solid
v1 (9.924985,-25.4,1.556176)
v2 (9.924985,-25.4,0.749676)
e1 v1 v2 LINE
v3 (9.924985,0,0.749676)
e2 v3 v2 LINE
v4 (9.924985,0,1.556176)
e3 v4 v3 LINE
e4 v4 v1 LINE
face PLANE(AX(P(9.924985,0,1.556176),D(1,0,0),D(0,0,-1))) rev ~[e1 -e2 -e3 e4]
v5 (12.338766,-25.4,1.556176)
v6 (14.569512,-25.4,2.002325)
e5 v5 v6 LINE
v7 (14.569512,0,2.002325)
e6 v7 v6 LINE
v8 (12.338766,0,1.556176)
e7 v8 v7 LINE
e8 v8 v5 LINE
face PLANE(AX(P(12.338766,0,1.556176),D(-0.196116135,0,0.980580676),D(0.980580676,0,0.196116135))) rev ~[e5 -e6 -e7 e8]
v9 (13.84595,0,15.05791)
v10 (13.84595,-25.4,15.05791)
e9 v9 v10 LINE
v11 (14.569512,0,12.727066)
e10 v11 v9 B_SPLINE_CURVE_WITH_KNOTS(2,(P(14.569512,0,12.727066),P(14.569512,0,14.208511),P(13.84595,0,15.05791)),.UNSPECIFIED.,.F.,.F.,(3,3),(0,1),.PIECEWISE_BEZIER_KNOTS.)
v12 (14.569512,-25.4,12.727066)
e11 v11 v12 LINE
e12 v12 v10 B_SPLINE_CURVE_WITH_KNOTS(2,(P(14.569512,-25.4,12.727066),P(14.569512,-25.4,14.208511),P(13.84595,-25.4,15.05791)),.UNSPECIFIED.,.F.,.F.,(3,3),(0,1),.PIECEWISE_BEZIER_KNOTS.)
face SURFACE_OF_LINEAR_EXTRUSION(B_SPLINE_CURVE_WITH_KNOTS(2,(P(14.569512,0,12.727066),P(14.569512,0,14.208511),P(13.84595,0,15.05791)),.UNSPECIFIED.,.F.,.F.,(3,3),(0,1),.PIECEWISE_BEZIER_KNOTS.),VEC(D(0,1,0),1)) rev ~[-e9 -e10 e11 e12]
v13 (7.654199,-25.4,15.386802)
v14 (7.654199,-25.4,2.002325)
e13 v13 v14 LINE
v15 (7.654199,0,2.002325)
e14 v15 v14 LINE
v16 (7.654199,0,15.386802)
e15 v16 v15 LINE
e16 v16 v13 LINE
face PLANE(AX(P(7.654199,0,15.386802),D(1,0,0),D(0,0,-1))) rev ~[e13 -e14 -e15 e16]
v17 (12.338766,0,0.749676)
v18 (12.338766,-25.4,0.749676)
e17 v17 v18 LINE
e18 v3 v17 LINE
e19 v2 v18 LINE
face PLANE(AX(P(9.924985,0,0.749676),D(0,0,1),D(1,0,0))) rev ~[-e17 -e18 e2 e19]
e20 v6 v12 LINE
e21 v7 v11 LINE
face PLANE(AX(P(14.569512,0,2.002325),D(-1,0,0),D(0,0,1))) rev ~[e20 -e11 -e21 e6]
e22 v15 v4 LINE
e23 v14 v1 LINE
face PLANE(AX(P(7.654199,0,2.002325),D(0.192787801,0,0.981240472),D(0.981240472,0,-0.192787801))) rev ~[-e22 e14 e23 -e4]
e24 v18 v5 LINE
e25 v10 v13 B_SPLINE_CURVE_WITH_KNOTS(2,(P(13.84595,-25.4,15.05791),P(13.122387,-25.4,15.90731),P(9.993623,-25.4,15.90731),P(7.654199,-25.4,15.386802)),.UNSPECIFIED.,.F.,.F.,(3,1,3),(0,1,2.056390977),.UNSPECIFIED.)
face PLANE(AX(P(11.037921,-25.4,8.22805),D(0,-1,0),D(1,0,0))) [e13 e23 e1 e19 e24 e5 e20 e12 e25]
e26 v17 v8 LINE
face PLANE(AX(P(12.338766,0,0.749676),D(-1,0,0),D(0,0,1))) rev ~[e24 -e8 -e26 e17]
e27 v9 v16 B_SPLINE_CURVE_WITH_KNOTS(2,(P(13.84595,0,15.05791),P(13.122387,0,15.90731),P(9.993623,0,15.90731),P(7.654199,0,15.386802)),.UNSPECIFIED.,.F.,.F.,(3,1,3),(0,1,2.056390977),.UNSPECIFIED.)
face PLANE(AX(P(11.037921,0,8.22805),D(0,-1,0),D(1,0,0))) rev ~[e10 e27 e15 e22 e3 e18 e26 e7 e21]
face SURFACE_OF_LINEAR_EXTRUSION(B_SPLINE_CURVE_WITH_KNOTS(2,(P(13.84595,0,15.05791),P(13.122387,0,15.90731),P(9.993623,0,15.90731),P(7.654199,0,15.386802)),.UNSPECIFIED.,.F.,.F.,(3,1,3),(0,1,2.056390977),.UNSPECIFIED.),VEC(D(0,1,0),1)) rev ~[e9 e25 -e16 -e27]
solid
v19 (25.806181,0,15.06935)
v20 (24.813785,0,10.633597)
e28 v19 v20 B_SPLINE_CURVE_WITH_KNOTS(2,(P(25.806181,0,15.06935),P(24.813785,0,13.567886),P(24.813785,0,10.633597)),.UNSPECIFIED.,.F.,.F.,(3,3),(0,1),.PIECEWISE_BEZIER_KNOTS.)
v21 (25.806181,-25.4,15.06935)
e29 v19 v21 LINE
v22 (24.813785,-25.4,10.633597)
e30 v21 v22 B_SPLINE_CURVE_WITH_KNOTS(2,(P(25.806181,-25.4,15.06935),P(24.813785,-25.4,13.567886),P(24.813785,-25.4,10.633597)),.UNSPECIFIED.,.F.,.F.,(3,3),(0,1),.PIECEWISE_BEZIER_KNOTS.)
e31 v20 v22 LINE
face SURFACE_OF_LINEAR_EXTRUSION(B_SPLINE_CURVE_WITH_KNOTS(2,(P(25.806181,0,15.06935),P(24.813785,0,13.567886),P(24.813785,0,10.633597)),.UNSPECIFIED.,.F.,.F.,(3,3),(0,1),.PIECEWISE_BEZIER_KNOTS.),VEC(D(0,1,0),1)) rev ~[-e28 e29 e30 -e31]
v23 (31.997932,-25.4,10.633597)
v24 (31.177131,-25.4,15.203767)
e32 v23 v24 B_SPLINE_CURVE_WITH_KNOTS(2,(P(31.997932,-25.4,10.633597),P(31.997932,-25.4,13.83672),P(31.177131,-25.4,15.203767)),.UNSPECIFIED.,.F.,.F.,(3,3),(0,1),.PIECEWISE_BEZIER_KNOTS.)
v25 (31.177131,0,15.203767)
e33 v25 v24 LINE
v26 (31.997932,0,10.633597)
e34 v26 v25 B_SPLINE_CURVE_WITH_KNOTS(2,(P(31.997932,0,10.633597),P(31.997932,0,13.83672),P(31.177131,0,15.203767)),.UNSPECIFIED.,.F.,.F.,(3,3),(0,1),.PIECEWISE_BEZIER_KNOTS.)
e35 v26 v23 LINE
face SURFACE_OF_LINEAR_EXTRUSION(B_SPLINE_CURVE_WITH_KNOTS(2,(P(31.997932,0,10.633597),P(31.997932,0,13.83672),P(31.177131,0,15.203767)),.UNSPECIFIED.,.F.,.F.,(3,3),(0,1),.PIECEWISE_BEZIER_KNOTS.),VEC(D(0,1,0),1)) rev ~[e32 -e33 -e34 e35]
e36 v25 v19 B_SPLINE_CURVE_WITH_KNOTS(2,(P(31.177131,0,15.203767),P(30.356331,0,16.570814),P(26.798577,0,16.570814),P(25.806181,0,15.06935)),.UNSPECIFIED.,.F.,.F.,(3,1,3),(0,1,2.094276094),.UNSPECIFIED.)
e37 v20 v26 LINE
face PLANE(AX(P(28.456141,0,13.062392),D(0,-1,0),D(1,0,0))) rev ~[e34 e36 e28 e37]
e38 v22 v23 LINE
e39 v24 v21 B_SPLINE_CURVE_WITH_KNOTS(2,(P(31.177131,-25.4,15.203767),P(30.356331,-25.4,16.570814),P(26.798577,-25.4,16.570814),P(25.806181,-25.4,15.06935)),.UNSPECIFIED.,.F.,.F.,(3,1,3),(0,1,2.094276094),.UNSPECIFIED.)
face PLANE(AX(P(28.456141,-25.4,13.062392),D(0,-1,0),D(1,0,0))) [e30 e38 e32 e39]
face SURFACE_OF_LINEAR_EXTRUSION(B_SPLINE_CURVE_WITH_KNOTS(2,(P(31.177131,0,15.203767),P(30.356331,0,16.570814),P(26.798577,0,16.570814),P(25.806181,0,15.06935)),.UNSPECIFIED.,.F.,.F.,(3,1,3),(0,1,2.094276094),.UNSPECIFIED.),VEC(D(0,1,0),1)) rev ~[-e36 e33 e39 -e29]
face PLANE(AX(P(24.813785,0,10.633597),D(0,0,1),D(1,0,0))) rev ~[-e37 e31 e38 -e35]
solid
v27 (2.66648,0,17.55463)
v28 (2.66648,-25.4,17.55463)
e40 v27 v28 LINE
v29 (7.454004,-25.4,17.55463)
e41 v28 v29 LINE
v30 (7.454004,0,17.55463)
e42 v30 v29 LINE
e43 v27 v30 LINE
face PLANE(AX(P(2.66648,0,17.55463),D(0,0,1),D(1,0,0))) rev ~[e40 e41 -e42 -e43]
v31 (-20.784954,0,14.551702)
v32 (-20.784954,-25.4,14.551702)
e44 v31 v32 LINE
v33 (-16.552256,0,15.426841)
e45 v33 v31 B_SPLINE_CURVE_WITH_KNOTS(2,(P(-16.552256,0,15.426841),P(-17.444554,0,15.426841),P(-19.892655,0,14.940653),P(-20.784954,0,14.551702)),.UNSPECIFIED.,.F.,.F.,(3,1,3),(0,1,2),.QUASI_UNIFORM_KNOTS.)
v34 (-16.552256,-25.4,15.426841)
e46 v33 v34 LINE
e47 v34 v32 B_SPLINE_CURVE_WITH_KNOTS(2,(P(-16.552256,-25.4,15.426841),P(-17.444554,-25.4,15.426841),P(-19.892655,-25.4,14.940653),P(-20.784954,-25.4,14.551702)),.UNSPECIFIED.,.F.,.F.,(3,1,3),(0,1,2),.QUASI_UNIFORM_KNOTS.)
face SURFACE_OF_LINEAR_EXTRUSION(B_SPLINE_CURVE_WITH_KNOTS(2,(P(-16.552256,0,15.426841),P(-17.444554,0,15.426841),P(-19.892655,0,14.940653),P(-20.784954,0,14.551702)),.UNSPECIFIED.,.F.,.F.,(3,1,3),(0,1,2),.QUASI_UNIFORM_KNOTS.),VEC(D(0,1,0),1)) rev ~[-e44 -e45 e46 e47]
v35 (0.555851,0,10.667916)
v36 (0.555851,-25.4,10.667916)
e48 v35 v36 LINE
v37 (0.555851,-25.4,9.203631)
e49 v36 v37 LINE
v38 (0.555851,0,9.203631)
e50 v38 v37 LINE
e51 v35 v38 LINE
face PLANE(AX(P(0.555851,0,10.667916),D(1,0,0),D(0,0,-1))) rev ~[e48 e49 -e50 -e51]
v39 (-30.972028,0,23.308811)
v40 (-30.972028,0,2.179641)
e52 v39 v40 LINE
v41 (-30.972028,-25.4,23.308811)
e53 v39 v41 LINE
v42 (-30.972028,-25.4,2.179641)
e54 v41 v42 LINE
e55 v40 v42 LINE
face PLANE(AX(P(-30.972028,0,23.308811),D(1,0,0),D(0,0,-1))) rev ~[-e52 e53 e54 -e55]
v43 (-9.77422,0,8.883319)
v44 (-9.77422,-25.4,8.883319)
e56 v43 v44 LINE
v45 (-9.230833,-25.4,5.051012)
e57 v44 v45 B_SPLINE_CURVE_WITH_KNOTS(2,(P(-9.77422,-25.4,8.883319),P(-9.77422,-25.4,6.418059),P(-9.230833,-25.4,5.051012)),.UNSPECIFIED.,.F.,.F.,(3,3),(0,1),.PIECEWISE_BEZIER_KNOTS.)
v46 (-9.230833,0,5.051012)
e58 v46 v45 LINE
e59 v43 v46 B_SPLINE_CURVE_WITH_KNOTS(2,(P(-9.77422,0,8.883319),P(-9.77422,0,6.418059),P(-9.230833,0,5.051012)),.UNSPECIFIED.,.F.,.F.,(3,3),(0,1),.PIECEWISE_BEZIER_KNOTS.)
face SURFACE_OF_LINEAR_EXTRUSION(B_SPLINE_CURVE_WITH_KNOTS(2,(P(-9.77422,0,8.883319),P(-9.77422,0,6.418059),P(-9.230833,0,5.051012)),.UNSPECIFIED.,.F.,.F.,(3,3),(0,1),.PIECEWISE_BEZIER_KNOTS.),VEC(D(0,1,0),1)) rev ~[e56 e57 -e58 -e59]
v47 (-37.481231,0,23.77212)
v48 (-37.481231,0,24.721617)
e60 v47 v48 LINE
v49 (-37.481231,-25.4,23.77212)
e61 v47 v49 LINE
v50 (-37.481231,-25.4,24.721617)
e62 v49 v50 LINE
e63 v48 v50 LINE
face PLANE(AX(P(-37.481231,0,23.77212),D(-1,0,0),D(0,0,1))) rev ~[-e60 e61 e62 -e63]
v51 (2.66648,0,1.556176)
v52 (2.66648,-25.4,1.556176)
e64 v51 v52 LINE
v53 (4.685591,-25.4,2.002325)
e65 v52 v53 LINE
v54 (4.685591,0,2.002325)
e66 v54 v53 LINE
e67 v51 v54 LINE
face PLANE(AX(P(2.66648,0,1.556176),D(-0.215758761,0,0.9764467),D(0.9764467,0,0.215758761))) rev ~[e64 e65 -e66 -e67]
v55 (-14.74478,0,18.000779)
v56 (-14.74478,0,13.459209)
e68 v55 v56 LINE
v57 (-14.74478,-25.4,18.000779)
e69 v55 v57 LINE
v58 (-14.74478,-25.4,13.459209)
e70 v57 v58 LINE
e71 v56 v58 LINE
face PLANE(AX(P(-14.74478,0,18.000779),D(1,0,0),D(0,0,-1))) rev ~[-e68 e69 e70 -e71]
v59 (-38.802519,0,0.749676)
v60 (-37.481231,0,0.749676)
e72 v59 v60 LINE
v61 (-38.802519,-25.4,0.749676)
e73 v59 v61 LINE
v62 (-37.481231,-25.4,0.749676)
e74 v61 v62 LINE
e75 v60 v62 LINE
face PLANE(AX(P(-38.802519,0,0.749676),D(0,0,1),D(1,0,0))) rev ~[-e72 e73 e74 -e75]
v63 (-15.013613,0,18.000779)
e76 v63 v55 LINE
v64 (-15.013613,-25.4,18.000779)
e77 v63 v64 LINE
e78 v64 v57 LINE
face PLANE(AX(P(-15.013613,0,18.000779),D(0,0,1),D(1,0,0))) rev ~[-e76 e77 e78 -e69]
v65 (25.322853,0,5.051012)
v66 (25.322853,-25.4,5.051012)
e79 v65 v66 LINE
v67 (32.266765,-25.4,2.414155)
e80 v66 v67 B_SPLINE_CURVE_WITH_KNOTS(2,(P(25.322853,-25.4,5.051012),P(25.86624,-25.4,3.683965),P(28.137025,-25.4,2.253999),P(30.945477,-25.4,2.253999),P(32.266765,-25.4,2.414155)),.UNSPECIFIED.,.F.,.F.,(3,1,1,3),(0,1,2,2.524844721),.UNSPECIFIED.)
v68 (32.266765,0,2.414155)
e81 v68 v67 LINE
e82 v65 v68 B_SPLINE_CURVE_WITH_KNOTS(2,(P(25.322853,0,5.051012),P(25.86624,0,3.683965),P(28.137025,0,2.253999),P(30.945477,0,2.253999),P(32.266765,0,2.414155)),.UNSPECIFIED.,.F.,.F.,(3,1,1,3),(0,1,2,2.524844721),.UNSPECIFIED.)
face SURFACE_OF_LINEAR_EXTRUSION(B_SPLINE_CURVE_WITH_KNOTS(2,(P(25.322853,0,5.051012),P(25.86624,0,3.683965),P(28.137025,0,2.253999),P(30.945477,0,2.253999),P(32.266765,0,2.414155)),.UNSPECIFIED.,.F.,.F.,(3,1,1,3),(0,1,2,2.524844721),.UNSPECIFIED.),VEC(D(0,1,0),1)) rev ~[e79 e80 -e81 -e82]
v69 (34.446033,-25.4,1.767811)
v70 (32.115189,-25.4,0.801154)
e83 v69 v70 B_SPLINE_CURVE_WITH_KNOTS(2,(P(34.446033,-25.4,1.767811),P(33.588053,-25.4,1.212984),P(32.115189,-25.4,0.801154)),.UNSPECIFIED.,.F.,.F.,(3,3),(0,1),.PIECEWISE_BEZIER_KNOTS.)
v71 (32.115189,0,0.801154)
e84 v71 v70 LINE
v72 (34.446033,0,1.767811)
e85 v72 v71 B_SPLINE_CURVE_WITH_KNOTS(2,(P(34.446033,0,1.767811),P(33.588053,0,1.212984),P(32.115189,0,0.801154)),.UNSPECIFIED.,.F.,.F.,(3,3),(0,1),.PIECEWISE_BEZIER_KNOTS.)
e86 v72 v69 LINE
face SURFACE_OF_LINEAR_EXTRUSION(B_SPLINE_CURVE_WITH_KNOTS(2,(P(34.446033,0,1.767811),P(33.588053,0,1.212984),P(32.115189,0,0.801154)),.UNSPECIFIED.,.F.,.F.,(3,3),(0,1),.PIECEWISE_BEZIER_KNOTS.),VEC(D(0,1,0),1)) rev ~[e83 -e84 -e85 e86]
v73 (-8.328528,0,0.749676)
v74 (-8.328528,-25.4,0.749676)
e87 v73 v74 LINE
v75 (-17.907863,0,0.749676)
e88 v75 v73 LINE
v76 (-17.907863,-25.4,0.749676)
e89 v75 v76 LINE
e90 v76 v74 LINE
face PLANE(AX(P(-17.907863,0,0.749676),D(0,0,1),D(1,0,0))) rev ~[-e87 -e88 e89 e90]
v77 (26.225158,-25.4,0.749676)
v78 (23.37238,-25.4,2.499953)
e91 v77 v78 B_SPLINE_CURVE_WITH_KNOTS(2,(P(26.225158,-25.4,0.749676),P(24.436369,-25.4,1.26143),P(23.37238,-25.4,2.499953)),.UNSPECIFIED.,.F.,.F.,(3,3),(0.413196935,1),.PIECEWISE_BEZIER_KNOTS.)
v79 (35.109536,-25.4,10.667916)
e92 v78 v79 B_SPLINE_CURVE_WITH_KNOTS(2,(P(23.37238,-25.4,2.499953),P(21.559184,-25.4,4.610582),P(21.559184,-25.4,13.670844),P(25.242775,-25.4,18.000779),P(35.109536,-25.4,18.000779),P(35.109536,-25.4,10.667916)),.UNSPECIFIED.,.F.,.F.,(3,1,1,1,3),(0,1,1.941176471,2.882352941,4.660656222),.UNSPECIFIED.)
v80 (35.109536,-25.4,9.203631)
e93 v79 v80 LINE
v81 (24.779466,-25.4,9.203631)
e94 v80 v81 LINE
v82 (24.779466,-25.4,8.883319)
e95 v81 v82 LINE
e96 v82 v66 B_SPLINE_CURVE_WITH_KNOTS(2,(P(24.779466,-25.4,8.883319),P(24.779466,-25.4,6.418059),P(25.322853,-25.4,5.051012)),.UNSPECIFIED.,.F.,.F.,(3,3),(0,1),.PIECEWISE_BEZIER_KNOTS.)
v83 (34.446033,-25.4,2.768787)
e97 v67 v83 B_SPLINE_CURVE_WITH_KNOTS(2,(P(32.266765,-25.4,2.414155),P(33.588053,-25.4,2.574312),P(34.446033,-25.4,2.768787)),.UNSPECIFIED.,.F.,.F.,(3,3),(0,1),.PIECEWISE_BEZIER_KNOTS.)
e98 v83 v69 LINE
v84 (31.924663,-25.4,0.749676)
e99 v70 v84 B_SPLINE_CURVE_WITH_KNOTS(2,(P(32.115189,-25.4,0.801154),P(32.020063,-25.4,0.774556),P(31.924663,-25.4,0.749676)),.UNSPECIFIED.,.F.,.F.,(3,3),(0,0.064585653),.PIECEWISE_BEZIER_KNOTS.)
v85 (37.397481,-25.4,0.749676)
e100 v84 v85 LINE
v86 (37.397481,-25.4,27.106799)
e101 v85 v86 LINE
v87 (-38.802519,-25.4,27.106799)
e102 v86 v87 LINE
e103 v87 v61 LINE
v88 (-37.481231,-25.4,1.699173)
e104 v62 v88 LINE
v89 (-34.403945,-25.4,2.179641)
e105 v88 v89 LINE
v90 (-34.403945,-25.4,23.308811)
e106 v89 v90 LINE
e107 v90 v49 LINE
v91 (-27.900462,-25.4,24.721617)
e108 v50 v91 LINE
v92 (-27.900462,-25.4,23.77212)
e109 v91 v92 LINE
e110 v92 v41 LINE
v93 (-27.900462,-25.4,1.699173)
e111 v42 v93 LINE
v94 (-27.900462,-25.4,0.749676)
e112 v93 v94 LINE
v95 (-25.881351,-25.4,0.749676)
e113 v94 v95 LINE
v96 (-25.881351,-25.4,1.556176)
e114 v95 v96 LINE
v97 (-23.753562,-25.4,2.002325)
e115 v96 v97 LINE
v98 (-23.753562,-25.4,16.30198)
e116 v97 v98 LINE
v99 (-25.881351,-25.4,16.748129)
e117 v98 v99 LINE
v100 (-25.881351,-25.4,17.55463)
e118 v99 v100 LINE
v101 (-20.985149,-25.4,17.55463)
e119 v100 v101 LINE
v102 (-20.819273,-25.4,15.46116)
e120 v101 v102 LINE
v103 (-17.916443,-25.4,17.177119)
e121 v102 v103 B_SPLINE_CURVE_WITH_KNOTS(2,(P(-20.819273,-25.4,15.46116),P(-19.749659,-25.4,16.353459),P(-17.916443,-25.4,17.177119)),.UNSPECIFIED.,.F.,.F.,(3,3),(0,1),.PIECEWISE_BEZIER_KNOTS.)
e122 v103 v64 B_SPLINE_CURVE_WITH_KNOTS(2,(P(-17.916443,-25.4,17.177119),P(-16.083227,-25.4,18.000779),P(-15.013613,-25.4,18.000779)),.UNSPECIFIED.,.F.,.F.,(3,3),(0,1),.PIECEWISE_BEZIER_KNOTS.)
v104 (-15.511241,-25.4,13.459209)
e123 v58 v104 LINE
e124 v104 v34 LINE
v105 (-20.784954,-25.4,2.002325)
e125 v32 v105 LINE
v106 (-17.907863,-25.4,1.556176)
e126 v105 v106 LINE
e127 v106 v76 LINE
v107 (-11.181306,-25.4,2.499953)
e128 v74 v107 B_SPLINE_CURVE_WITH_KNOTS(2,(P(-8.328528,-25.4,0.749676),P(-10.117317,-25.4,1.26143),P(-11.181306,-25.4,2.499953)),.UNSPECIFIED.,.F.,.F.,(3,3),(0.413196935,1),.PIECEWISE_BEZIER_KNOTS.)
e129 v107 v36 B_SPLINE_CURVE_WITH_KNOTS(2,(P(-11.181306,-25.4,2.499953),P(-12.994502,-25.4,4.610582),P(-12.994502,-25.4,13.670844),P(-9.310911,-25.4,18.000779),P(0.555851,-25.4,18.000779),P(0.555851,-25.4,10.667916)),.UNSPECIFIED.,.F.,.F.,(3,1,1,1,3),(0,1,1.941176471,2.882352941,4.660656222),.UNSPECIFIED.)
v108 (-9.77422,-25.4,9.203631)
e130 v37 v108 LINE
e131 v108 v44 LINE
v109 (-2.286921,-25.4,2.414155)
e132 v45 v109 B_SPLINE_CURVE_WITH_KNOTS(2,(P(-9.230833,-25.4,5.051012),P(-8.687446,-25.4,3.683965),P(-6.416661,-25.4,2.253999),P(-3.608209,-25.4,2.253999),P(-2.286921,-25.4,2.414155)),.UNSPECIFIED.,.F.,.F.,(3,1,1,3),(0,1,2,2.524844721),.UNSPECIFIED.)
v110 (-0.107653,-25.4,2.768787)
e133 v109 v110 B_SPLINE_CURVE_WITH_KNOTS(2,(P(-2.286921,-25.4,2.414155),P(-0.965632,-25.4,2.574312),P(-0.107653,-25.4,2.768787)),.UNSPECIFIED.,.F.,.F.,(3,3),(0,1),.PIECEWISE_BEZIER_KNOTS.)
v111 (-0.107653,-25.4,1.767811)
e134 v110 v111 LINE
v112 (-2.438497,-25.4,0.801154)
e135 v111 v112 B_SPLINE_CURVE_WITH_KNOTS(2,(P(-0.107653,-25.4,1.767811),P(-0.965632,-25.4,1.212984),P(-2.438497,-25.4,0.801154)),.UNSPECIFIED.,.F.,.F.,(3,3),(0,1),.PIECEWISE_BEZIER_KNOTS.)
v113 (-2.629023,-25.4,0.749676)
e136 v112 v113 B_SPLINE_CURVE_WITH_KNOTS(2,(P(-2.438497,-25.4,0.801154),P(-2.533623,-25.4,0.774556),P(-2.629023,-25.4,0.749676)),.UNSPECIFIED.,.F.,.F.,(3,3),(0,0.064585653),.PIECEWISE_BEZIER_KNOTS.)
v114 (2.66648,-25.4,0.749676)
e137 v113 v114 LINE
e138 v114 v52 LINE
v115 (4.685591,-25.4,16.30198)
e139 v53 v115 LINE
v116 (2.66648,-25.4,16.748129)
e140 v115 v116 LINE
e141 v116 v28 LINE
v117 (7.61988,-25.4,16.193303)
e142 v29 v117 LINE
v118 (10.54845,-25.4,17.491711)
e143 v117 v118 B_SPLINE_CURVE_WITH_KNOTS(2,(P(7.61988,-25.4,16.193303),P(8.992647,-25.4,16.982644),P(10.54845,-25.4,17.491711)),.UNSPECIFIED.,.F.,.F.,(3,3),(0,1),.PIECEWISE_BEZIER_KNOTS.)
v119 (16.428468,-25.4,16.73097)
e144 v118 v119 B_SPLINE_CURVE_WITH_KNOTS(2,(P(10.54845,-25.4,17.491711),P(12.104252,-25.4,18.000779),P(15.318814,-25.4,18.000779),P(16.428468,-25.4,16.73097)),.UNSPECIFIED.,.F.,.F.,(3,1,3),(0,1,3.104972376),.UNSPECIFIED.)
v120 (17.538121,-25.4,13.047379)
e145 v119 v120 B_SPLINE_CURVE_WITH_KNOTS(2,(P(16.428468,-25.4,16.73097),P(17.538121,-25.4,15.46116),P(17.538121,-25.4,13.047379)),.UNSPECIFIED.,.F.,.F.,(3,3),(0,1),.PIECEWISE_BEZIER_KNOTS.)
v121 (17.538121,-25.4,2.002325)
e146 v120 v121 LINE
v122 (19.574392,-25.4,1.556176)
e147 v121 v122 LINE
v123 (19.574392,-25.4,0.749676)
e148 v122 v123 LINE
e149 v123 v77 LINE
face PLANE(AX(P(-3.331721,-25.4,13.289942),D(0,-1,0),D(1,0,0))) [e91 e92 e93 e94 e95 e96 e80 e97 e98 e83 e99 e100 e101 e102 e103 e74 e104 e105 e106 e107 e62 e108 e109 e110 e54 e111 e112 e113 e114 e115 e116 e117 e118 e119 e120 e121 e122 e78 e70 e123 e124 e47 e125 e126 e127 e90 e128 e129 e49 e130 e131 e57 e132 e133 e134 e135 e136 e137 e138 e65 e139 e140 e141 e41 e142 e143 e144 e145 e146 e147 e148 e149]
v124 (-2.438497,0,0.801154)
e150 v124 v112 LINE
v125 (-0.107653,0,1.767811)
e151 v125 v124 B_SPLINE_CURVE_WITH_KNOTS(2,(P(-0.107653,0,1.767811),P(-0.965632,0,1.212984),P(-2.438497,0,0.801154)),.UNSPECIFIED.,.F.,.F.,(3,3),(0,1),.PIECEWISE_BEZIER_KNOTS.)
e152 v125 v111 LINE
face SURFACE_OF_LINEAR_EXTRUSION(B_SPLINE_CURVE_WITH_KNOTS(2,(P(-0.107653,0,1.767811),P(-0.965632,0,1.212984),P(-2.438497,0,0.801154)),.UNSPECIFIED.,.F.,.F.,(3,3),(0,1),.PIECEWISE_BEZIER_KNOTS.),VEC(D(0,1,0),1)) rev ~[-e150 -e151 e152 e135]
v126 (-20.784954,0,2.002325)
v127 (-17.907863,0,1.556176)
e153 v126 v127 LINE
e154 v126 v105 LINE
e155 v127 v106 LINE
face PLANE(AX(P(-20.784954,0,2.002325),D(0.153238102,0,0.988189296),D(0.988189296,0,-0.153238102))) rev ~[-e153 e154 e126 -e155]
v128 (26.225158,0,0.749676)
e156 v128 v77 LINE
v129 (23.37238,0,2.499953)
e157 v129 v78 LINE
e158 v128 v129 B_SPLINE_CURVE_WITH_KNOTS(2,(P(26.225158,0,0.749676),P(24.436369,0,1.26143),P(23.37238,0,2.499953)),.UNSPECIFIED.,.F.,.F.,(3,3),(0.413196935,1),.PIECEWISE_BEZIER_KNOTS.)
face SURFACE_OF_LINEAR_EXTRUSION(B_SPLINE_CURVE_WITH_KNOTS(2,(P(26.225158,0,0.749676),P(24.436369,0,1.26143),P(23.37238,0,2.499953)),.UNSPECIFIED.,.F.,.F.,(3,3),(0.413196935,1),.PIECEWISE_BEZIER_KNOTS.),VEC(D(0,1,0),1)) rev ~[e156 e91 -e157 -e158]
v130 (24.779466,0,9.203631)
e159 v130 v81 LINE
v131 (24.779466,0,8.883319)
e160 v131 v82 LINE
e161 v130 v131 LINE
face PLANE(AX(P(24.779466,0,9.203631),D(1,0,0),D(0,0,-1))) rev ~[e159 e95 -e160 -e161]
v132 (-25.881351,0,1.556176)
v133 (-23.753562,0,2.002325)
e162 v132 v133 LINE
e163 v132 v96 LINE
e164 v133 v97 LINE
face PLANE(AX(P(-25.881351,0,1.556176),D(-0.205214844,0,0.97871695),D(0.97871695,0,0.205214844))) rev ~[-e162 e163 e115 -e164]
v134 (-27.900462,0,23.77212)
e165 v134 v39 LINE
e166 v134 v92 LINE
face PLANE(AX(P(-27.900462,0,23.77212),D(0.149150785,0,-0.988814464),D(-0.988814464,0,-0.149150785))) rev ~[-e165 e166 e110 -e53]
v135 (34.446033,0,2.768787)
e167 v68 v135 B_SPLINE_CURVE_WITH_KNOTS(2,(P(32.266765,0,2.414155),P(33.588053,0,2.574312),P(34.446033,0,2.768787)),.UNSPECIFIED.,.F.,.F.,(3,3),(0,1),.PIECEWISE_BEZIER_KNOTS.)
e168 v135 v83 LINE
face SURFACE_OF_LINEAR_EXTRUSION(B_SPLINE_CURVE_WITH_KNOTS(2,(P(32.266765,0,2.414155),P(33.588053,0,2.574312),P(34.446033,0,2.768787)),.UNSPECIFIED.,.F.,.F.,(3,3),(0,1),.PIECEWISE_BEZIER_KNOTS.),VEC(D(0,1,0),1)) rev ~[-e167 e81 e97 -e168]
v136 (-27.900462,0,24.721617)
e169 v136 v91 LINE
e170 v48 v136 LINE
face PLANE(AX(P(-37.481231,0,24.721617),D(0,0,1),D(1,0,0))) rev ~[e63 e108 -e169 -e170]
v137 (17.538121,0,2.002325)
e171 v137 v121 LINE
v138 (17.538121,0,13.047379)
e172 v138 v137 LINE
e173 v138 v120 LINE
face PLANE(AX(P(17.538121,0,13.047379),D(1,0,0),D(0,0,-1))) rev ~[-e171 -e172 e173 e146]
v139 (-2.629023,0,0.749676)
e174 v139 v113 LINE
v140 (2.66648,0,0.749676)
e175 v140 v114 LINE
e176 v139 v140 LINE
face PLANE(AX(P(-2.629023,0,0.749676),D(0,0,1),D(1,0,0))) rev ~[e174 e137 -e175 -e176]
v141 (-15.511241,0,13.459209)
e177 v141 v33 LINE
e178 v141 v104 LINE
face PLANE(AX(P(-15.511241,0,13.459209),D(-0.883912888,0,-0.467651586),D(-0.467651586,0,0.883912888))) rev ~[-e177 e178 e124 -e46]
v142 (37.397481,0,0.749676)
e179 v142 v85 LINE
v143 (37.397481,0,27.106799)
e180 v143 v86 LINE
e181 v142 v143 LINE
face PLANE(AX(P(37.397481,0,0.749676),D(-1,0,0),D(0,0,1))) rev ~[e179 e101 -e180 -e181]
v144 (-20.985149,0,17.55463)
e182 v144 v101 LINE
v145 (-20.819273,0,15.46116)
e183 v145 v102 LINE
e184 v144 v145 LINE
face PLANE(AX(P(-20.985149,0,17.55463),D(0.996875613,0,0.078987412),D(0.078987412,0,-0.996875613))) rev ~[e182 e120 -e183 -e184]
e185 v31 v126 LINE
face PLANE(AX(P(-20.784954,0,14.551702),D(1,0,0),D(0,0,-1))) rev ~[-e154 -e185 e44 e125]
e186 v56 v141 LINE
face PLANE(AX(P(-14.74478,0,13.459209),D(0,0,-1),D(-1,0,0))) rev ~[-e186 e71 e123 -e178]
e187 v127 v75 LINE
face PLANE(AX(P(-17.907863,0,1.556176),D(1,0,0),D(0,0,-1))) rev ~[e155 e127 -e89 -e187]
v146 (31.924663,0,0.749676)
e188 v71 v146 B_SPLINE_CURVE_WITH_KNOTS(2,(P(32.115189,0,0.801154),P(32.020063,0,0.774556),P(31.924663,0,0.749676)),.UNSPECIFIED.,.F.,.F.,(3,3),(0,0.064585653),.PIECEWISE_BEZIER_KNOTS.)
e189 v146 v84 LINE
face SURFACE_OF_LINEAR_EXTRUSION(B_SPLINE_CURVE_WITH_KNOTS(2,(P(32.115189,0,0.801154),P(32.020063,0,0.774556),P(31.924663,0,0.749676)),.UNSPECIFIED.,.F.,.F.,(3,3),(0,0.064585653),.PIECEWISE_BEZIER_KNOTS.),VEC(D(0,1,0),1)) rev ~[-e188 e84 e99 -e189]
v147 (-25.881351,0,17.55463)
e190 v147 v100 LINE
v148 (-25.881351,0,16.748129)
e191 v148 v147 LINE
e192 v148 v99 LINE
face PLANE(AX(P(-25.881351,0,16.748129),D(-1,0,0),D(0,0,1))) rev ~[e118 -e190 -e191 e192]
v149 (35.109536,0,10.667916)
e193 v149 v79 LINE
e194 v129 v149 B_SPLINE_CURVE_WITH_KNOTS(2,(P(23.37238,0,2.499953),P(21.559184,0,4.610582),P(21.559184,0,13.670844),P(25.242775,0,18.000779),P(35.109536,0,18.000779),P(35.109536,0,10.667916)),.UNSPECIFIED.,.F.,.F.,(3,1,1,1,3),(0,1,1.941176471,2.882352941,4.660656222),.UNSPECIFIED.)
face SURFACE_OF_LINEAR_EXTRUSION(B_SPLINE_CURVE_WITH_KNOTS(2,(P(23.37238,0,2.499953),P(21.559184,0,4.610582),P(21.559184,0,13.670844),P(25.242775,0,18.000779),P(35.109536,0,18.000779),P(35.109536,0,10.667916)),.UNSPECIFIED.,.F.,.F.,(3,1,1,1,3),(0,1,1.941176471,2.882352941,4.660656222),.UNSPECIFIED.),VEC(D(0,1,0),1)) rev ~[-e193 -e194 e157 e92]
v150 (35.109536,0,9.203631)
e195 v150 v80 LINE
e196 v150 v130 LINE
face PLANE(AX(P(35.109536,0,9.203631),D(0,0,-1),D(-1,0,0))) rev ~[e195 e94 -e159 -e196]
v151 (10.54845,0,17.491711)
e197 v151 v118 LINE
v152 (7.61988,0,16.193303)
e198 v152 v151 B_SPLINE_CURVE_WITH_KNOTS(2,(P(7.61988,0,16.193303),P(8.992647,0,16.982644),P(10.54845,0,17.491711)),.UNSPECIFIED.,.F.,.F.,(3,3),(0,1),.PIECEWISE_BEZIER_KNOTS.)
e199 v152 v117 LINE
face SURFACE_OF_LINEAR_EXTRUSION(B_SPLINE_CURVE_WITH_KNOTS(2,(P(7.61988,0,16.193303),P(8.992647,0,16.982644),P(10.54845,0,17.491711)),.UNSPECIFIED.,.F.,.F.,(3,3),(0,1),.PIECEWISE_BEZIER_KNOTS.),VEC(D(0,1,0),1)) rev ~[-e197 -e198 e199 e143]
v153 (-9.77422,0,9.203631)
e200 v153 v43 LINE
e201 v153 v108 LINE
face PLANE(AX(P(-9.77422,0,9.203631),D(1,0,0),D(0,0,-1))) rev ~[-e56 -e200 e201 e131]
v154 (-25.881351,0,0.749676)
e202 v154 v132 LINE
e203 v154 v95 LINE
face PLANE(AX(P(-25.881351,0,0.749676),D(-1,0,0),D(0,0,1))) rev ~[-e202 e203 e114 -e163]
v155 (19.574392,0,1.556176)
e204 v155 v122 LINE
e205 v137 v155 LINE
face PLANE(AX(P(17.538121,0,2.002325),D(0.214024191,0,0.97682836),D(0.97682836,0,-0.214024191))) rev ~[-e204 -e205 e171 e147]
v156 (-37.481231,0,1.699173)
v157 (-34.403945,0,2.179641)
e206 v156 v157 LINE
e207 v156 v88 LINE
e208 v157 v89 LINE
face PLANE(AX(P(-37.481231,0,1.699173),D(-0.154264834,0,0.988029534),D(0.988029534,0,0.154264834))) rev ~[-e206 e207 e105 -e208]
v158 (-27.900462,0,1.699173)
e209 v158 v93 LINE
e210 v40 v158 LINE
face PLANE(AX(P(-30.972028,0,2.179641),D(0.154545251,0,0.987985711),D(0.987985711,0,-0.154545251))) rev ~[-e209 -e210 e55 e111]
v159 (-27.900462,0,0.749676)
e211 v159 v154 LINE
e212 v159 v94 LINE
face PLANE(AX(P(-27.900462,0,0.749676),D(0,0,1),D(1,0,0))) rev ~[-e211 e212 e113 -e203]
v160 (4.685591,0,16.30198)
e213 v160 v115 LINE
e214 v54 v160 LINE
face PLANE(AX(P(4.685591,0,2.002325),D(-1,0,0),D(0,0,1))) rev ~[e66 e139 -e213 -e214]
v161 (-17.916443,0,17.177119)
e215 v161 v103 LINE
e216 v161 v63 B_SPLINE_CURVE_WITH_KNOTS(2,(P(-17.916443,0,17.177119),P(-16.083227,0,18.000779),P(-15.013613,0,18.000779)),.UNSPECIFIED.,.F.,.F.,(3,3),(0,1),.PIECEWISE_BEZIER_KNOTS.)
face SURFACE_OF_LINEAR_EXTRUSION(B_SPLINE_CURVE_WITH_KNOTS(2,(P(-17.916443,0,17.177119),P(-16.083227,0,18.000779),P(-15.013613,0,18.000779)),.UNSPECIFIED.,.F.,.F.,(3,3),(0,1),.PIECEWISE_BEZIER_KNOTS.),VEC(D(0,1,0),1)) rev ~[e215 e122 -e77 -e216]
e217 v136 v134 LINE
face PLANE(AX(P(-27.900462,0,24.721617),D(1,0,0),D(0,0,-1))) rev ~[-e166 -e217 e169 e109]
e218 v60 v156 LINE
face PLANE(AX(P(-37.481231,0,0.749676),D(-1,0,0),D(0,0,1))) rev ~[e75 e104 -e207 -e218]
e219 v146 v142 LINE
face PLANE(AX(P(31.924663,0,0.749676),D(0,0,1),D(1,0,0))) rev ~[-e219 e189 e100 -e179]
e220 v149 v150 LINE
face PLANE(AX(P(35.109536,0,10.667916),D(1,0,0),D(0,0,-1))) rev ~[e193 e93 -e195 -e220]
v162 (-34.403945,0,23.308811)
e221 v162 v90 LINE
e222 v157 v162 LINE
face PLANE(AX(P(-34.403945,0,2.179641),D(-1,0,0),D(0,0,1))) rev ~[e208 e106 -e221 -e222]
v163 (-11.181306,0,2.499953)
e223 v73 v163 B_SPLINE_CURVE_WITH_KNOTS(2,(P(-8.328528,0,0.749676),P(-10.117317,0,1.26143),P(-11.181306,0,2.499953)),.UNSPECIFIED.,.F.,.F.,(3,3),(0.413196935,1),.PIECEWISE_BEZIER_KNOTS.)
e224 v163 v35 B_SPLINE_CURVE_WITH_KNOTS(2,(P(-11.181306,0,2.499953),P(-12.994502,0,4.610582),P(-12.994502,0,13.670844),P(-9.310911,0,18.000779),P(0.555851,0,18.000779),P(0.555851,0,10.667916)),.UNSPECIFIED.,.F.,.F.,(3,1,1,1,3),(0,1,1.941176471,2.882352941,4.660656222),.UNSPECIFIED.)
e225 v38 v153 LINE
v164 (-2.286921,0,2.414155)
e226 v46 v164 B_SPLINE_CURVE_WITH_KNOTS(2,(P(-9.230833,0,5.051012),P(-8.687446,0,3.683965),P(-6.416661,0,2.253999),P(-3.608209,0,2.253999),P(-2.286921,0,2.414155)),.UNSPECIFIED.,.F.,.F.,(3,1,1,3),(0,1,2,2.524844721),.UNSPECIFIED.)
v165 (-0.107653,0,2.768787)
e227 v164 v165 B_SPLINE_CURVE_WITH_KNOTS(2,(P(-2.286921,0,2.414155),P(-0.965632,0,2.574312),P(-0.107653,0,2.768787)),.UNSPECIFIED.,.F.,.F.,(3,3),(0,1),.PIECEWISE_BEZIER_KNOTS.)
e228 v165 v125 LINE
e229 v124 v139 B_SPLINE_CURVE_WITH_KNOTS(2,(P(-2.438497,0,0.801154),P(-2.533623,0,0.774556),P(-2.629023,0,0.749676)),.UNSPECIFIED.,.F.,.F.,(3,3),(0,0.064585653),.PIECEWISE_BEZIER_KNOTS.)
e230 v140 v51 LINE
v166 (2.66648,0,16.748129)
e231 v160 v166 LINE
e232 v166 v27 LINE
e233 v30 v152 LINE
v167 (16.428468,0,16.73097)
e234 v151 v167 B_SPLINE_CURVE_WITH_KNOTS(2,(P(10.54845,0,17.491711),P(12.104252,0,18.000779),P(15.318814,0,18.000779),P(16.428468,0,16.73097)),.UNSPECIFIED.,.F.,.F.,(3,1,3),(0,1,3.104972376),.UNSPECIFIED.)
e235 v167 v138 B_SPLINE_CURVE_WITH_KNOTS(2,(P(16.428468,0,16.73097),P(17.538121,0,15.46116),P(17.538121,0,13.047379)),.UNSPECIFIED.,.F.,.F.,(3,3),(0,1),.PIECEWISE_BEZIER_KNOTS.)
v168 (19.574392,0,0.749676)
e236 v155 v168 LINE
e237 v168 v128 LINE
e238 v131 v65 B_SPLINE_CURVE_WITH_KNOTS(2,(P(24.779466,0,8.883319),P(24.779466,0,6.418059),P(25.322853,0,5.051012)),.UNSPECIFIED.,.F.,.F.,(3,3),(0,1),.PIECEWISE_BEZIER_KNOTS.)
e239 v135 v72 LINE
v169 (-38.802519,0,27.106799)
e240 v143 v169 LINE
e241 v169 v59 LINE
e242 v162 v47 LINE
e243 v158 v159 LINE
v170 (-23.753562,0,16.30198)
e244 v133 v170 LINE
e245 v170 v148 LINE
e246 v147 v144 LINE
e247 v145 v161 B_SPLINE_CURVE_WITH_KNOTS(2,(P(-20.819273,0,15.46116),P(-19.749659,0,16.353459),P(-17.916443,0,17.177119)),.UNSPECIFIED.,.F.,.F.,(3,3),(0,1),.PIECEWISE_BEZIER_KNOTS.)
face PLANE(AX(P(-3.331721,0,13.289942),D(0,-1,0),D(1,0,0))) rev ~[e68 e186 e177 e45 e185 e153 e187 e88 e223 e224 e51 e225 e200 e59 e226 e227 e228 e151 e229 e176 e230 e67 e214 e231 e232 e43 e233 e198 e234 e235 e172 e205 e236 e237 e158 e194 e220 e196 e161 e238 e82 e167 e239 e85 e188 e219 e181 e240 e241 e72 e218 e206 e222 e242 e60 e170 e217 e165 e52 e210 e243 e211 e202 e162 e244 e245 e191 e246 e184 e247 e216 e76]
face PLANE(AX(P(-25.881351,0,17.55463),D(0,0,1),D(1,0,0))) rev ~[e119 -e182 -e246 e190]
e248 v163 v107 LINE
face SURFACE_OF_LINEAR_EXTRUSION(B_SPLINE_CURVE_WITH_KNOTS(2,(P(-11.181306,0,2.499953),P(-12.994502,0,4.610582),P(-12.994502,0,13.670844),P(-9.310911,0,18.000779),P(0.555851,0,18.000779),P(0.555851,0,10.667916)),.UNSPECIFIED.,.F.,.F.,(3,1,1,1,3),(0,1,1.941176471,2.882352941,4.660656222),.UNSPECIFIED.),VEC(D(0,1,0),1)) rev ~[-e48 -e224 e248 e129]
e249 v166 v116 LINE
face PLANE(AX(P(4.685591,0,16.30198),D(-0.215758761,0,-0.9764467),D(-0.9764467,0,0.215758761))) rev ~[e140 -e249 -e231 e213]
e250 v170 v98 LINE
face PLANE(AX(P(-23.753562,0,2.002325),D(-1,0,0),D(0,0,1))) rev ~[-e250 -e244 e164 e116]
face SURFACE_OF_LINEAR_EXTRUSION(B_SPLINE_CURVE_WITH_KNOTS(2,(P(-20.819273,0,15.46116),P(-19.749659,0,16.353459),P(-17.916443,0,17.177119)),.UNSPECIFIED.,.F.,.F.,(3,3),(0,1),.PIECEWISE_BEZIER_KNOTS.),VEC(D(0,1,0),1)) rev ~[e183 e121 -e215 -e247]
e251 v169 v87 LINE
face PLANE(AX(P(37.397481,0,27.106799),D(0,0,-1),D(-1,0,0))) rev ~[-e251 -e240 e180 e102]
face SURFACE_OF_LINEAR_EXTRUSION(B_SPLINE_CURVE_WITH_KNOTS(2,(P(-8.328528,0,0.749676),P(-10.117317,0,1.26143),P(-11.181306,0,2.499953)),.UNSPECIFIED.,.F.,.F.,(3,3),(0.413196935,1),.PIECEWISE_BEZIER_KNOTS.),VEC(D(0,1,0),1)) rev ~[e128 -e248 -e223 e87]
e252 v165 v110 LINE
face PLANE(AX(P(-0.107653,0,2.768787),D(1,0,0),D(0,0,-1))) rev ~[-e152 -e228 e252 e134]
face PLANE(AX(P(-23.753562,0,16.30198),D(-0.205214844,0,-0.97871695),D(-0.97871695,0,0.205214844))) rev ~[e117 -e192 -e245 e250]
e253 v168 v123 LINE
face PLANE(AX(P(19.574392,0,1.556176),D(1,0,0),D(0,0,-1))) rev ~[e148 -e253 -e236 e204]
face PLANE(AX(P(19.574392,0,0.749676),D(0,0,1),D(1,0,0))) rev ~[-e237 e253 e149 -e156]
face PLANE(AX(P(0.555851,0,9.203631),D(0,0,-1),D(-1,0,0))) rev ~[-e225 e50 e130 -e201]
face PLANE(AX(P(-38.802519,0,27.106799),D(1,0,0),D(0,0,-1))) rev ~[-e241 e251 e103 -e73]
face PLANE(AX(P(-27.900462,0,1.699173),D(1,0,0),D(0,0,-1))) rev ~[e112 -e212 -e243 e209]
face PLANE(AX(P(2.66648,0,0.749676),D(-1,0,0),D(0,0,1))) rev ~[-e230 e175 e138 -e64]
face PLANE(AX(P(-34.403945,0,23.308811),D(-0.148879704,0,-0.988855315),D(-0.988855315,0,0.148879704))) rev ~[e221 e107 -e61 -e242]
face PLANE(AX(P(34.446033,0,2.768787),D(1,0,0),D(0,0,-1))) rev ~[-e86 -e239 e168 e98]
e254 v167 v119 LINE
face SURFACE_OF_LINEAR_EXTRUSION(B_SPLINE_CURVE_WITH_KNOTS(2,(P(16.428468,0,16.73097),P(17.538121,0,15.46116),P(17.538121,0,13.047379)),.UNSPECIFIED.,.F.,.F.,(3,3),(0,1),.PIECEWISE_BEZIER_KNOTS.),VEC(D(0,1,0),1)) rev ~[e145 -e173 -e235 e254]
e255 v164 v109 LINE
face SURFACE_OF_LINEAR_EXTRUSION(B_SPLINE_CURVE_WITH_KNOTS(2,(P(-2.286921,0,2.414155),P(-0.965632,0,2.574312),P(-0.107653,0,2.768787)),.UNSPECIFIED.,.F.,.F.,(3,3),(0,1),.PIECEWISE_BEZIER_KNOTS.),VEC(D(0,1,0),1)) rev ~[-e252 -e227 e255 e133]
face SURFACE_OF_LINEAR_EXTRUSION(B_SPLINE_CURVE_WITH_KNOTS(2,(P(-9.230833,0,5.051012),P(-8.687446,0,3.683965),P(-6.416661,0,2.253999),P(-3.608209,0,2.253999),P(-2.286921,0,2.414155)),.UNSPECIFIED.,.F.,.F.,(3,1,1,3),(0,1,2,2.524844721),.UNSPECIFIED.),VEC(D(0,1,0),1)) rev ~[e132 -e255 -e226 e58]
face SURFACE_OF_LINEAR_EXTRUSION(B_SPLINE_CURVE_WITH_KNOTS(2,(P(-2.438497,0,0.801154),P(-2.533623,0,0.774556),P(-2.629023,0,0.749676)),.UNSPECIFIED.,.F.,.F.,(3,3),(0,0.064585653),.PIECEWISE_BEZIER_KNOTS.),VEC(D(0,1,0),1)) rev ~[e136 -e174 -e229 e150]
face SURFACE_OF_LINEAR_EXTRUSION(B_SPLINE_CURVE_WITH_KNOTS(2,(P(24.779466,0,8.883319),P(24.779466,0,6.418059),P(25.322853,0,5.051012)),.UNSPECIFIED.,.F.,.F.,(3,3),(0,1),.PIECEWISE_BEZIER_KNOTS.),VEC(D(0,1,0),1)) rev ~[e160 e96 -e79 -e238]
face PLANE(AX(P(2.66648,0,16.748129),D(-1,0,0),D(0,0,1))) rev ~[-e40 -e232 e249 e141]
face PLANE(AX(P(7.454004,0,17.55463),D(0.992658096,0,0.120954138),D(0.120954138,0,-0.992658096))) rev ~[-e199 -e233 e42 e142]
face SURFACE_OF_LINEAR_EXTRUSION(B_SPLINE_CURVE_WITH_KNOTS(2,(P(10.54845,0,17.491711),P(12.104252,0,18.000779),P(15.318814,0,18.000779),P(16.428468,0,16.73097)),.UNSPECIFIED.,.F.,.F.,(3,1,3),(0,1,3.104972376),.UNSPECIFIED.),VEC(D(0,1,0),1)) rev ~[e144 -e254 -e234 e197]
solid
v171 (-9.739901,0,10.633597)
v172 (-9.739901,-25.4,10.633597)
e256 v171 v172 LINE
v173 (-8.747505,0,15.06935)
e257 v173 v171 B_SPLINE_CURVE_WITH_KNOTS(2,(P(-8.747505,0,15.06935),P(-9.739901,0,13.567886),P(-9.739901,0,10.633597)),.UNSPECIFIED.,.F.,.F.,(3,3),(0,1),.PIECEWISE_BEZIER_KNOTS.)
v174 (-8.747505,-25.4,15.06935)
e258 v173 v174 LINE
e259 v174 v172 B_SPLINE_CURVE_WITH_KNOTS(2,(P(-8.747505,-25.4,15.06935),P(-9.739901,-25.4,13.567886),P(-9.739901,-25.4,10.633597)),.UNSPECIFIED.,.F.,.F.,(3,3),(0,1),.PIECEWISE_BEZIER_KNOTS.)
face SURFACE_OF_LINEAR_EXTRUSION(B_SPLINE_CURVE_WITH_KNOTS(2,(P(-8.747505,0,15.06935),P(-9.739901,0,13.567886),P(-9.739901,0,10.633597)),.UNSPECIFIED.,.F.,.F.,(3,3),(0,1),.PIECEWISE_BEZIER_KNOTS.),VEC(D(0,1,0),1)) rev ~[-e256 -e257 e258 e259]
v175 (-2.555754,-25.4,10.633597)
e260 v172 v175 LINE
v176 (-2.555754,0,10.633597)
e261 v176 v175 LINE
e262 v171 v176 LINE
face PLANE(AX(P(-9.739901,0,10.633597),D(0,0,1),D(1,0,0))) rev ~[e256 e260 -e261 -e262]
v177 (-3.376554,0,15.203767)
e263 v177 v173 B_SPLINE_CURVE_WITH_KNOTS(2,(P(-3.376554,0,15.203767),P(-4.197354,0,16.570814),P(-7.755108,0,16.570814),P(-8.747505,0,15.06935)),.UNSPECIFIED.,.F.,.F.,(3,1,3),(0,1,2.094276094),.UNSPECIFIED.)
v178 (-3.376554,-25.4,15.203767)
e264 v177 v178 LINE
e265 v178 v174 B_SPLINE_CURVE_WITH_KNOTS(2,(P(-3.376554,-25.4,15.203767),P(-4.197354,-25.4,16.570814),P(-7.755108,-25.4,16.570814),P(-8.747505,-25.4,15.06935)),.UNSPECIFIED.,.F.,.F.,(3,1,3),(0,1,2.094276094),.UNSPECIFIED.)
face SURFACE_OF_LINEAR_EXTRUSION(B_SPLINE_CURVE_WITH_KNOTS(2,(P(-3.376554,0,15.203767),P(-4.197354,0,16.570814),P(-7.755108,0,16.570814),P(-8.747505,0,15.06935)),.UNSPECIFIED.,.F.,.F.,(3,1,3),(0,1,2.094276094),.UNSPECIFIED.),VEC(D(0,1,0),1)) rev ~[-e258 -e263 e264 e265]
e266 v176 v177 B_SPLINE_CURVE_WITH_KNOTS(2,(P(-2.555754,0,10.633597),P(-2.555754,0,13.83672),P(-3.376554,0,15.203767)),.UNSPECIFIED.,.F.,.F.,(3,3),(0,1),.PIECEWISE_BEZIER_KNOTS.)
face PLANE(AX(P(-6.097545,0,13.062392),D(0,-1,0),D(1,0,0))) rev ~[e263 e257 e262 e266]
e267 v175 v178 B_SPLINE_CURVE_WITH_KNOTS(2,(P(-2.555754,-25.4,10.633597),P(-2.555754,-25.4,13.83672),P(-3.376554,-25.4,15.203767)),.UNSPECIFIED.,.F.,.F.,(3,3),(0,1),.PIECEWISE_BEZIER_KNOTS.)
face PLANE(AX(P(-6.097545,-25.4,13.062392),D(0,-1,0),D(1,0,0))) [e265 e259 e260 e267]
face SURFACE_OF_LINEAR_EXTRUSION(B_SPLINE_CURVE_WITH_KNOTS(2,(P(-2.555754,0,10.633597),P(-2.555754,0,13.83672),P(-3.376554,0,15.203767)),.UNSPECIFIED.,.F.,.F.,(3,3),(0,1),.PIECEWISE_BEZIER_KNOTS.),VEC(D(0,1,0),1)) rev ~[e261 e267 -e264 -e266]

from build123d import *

# Parameters (mm, degrees)
F1_DEPTH = 25.4


with BuildPart() as f1:
    # F0 (on Front) → F1 (new body)
    with BuildSketch(Plane.XZ):
        with BuildLine():
            Line((37.3974812319, 27.1067991487), (-38.8025187681, 27.1067991487))
            Line((-38.8025187681, 27.1067991487), (-38.8025187681, 0.7496755936))
            Line((-38.8025187681, 0.7496755936), (-37.4812306732, 0.7496755936))
            Line((-37.4812306732, 0.7496755936), (-37.4812306732, 1.6991726661))
            Line((-37.4812306732, 1.6991726661), (-34.4039449803, 2.1796410643))
            Line((-34.4039449803, 2.1796410643), (-34.4039449803, 23.3088108586))
            Line((-34.4039449803, 23.3088108586), (-37.4812306732, 23.7721196711))
            Line((-37.4812306732, 23.7721196711), (-37.4812306732, 24.7216167436))
            Line((-37.4812306732, 24.7216167436), (-27.9004620198, 24.7216167436))
            Line((-27.9004620198, 24.7216167436), (-27.9004620198, 23.7721196711))
            Line((-27.9004620198, 23.7721196711), (-30.9720278508, 23.3088108586))
            Line((-30.9720278508, 23.3088108586), (-30.9720278508, 2.1796410643))
            Line((-30.9720278508, 2.1796410643), (-27.9004620198, 1.6991726661))
            Line((-27.9004620198, 1.6991726661), (-27.9004620198, 0.7496755936))
            Line((-27.9004620198, 0.7496755936), (-25.8813507753, 0.7496755936))
            Line((-25.8813507753, 0.7496755936), (-25.8813507753, 1.5561761191))
            Line((-25.8813507753, 1.5561761191), (-23.7535621549, 2.0023253459))
            Line((-23.7535621549, 2.0023253459), (-23.7535621549, 16.3019800524))
            Line((-23.7535621549, 16.3019800524), (-25.8813507753, 16.7481292793))
            Line((-25.8813507753, 16.7481292793), (-25.8813507753, 17.5546298047))
            Line((-25.8813507753, 17.5546298047), (-20.9851490038, 17.5546298047))
            Line((-20.9851490038, 17.5546298047), (-20.8192730092, 15.4611603557))
            add(Edge.make_bspline(
                [(-20.8192730092, 15.4611603557), (-19.7496588371, 16.3534588094), (-17.9164431038, 17.1771189205)],
                knots=[0, 0, 0, 1, 1, 1], degree=2))
            add(Edge.make_bspline(
                [(-17.9164431038, 17.1771189205), (-16.0832273704, 18.0007790316), (-15.0136131983, 18.0007790316)],
                knots=[0, 0, 0, 1, 1, 1], degree=2))
            Line((-15.0136131983, 18.0007790316), (-14.7447796899, 18.0007790316))
            Line((-14.7447796899, 18.0007790316), (-14.7447796899, 13.4592086968))
            Line((-14.7447796899, 13.4592086968), (-15.5112411821, 13.4592086968))
            Line((-15.5112411821, 13.4592086968), (-16.5522560448, 15.4268411844))
            add(Edge.make_bspline(
                [(-16.5522560448, 15.4268411844), (-17.4445544984, 15.4268411844), (-18.6686049413, 15.1837470544)],
                knots=[0, 0, 0, 1, 1, 1], degree=2))
            add(Edge.make_bspline(
                [(-18.6686049413, 15.1837470544), (-19.8926553842, 14.9406529244), (-20.7849538379, 14.5517023164)],
                knots=[0, 0, 0, 1, 1, 1], degree=2))
            Line((-20.7849538379, 14.5517023164), (-20.7849538379, 2.0023253459))
            Line((-20.7849538379, 2.0023253459), (-17.9078633109, 1.5561761191))
            Line((-17.9078633109, 1.5561761191), (-17.9078633109, 0.7496755936))
            Line((-17.9078633109, 0.7496755936), (-8.3285276719, 0.7496755936))
            add(Edge.make_bspline(
                [(-8.3285276719, 0.7496755936), (-10.11731664, 1.2614297437), (-11.181305737, 2.4999533297)],
                knots=[0.4131969353, 0.4131969353, 0.4131969353, 1, 1, 1], degree=2))
            add(Edge.make_bspline(
                [(-11.181305737, 2.4999533297), (-12.9945019538, 4.6105823644), (-12.9945019538, 9.2779896606)],
                knots=[0, 0, 0, 1, 1, 1], degree=2))
            add(Edge.make_bspline(
                [(-12.9945019538, 9.2779896606), (-12.9945019538, 13.6708435864), (-11.1527064276, 15.835811309)],
                knots=[0, 0, 0, 1, 1, 1], degree=2))
            add(Edge.make_bspline(
                [(-11.1527064276, 15.835811309), (-9.3109109014, 18.0007790316), (-5.8961533575, 18.0007790316)],
                knots=[0, 0, 0, 1, 1, 1], degree=2))
            add(Edge.make_bspline(
                [(-5.8961533575, 18.0007790316), (0.5558508461, 18.0007790316), (0.5558508461, 10.6679160981)],
                knots=[0, 0, 0, 1, 1, 1], degree=2))
            Line((0.5558508461, 10.6679160981), (0.5558508461, 9.2036314561))
            Line((0.5558508461, 9.2036314561), (-9.7742197139, 9.2036314561))
            Line((-9.7742197139, 9.2036314561), (-9.7742197139, 8.8833191907))
            add(Edge.make_bspline(
                [(-9.7742197139, 8.8833191907), (-9.7742197139, 6.4180587193), (-9.230832835, 5.0510117294)],
                knots=[0, 0, 0, 1, 1, 1], degree=2))
            add(Edge.make_bspline(
                [(-9.230832835, 5.0510117294), (-8.6874459562, 3.6839647394), (-7.5520533725, 2.9689820041)],
                knots=[0, 0, 0, 1, 1, 1], degree=2))
            add(Edge.make_bspline(
                [(-7.5520533725, 2.9689820041), (-6.4166607888, 2.2539992688), (-4.5748652626, 2.2539992688)],
                knots=[0, 0, 0, 1, 1, 1], degree=2))
            add(Edge.make_bspline(
                [(-4.5748652626, 2.2539992688), (-3.6082086044, 2.2539992688), (-2.2869205095, 2.4141554015)],
                knots=[0, 0, 0, 1, 1, 1], degree=2))
            add(Edge.make_bspline(
                [(-2.2869205095, 2.4141554015), (-0.9656324147, 2.5743115342), (-0.1076531323, 2.7687868382)],
                knots=[0, 0, 0, 1, 1, 1], degree=2))
            Line((-0.1076531323, 2.7687868382), (-0.1076531323, 1.7678110087))
            add(Edge.make_bspline(
                [(-0.1076531323, 1.7678110087), (-0.9656324147, 1.2129844061), (-2.4384968494, 0.8011543506)],
                knots=[0, 0, 0, 1, 1, 1], degree=2))
            add(Edge.make_bspline(
                [(-2.4384968494, 0.8011543506), (-2.5336227612, 0.7745560374), (-2.6290230549, 0.7496755936)],
                knots=[0, 0, 0, 0.0645856533, 0.0645856533, 0.0645856533], degree=2))
            Line((-2.6290230549, 0.7496755936), (2.6664798808, 0.7496755936))
            Line((2.6664798808, 0.7496755936), (2.6664798808, 1.5561761191))
            Line((2.6664798808, 1.5561761191), (4.6855911253, 2.0023253459))
            Line((4.6855911253, 2.0023253459), (4.6855911253, 16.3019800524))
            Line((4.6855911253, 16.3019800524), (2.6664798808, 16.7481292793))
            Line((2.6664798808, 16.7481292793), (2.6664798808, 17.5546298047))
            Line((2.6664798808, 17.5546298047), (7.4540042765, 17.5546298047))
            Line((7.4540042765, 17.5546298047), (7.6198802711, 16.1933026767))
            add(Edge.make_bspline(
                [(7.6198802711, 16.1933026767), (8.9926471229, 16.9826436165), (10.548449555, 17.491711324)],
                knots=[0, 0, 0, 1, 1, 1], degree=2))
            add(Edge.make_bspline(
                [(10.548449555, 17.491711324), (12.1042519871, 18.0007790316), (13.1395469878, 18.0007790316)],
                knots=[0, 0, 0, 1, 1, 1], degree=2))
            add(Edge.make_bspline(
                [(13.1395469878, 18.0007790316), (15.3188143651, 18.0007790316), (16.4284675703, 16.7309696936)],
                knots=[0, 0, 0, 1, 1, 1], degree=2))
            add(Edge.make_bspline(
                [(16.4284675703, 16.7309696936), (17.5381207755, 15.4611603557), (17.5381207755, 13.0473786412)],
                knots=[0, 0, 0, 1, 1, 1], degree=2))
            Line((17.5381207755, 13.0473786412), (17.5381207755, 2.0023253459))
            Line((17.5381207755, 2.0023253459), (19.5743916057, 1.5561761191))
            Line((19.5743916057, 1.5561761191), (19.5743916057, 0.7496755936))
            Line((19.5743916057, 0.7496755936), (26.2251579609, 0.7496755936))
            add(Edge.make_bspline(
                [(26.2251579609, 0.7496755936), (24.4363689928, 1.2614297437), (23.3723798958, 2.4999533297)],
                knots=[0.4131969353, 0.4131969353, 0.4131969353, 1, 1, 1], degree=2))
            add(Edge.make_bspline(
                [(23.3723798958, 2.4999533297), (21.559183679, 4.6105823644), (21.559183679, 9.2779896606)],
                knots=[0, 0, 0, 1, 1, 1], degree=2))
            add(Edge.make_bspline(
                [(21.559183679, 9.2779896606), (21.559183679, 13.6708435864), (23.4009792052, 15.835811309)],
                knots=[0, 0, 0, 1, 1, 1], degree=2))
            add(Edge.make_bspline(
                [(23.4009792052, 15.835811309), (25.2427747314, 18.0007790316), (28.6575322753, 18.0007790316)],
                knots=[0, 0, 0, 1, 1, 1], degree=2))
            add(Edge.make_bspline(
                [(28.6575322753, 18.0007790316), (35.1095364789, 18.0007790316), (35.1095364789, 10.6679160981)],
                knots=[0, 0, 0, 1, 1, 1], degree=2))
            Line((35.1095364789, 10.6679160981), (35.1095364789, 9.2036314561))
            Line((35.1095364789, 9.2036314561), (24.7794659189, 9.2036314561))
            Line((24.7794659189, 9.2036314561), (24.7794659189, 8.8833191907))
            add(Edge.make_bspline(
                [(24.7794659189, 8.8833191907), (24.7794659189, 6.4180587193), (25.3228527978, 5.0510117294)],
                knots=[0, 0, 0, 1, 1, 1], degree=2))
            add(Edge.make_bspline(
                [(25.3228527978, 5.0510117294), (25.8662396766, 3.6839647394), (27.0016322603, 2.9689820041)],
                knots=[0, 0, 0, 1, 1, 1], degree=2))
            add(Edge.make_bspline(
                [(27.0016322603, 2.9689820041), (28.137024844, 2.2539992688), (29.9788203702, 2.2539992688)],
                knots=[0, 0, 0, 1, 1, 1], degree=2))
            add(Edge.make_bspline(
                [(29.9788203702, 2.2539992688), (30.9454770284, 2.2539992688), (32.2667651232, 2.4141554015)],
                knots=[0, 0, 0, 1, 1, 1], degree=2))
            add(Edge.make_bspline(
                [(32.2667651232, 2.4141554015), (33.5880532181, 2.5743115342), (34.4460325005, 2.7687868382)],
                knots=[0, 0, 0, 1, 1, 1], degree=2))
            Line((34.4460325005, 2.7687868382), (34.4460325005, 1.7678110087))
            add(Edge.make_bspline(
                [(34.4460325005, 1.7678110087), (33.5880532181, 1.2129844061), (32.1151887834, 0.8011543506)],
                knots=[0, 0, 0, 1, 1, 1], degree=2))
            add(Edge.make_bspline(
                [(32.1151887834, 0.8011543506), (32.0200628716, 0.7745560374), (31.9246625779, 0.7496755936)],
                knots=[0, 0, 0, 0.0645856533, 0.0645856533, 0.0645856533], degree=2))
            Line((31.9246625779, 0.7496755936), (37.3974812319, 0.7496755936))
            Line((37.3974812319, 0.7496755936), (37.3974812319, 27.1067991487))
        make_face()
    extrude(amount=F1_DEPTH)


with BuildPart() as f1b:
    # F0 (on Front) → F1, piece 2 (new body)
    with BuildSketch(Plane.XZ):
        with BuildLine():
            Line((9.9249846098, 0.7496755936), (12.3387663243, 0.7496755936))
            Line((12.3387663243, 0.7496755936), (12.3387663243, 1.5561761191))
            Line((12.3387663243, 1.5561761191), (14.5695124585, 2.0023253459))
            Line((14.5695124585, 2.0023253459), (14.5695124585, 12.7270663758))
            add(Edge.make_bspline(
                [(14.5695124585, 12.7270663758), (14.5695124585, 14.2085106034), (13.8459499303, 15.057910093)],
                knots=[0, 0, 0, 1, 1, 1], degree=2))
            add(Edge.make_bspline(
                [(13.8459499303, 15.057910093), (13.1223874022, 15.9073095825), (11.6009041414, 15.9073095825)],
                knots=[0, 0, 0, 1, 1, 1], degree=2))
            add(Edge.make_bspline(
                [(11.6009041414, 15.9073095825), (9.9936229524, 15.9073095825), (7.6541994424, 15.3868021512)],
                knots=[0, 0, 0, 1, 1, 1], degree=2))
            Line((7.6541994424, 15.3868021512), (7.6541994424, 2.0023253459))
            Line((7.6541994424, 2.0023253459), (9.9249846098, 1.5561761191))
            Line((9.9249846098, 1.5561761191), (9.9249846098, 0.7496755936))
        make_face()
    extrude(amount=F1_DEPTH)


with BuildPart() as f1c:
    # F0 (on Front) → F1, piece 3 (new body)
    with BuildSketch(Plane.XZ):
        with BuildLine():
            add(Edge.make_bspline(
                [(31.1771314346, 15.203766571), (30.3563312545, 16.5708135609), (28.6575322753, 16.5708135609)],
                knots=[0, 0, 0, 1, 1, 1], degree=2))
            add(Edge.make_bspline(
                [(28.6575322753, 16.5708135609), (26.7985771635, 16.5708135609), (25.8061811268, 15.0693498167)],
                knots=[0, 0, 0, 1, 1, 1], degree=2))
            add(Edge.make_bspline(
                [(25.8061811268, 15.0693498167), (24.8137850902, 13.5678860725), (24.8137850902, 10.6335969268)],
                knots=[0, 0, 0, 1, 1, 1], degree=2))
            Line((24.8137850902, 10.6335969268), (31.9979316148, 10.6335969268))
            add(Edge.make_bspline(
                [(31.9979316148, 10.6335969268), (31.9979316148, 13.836719581), (31.1771314346, 15.203766571)],
                knots=[0, 0, 0, 1, 1, 1], degree=2))
        make_face()
    extrude(amount=F1_DEPTH)


with BuildPart() as f1d:
    # F0 (on Front) → F1, piece 4 (new body)
    with BuildSketch(Plane.XZ):
        with BuildLine():
            add(Edge.make_bspline(
                [(-3.3765541982, 15.203766571), (-4.1973543783, 16.5708135609), (-5.8961533575, 16.5708135609)],
                knots=[0, 0, 0, 1, 1, 1], degree=2))
            add(Edge.make_bspline(
                [(-5.8961533575, 16.5708135609), (-7.7551084693, 16.5708135609), (-8.7475045059, 15.0693498167)],
                knots=[0, 0, 0, 1, 1, 1], degree=2))
            add(Edge.make_bspline(
                [(-8.7475045059, 15.0693498167), (-9.7399005426, 13.5678860725), (-9.7399005426, 10.6335969268)],
                knots=[0, 0, 0, 1, 1, 1], degree=2))
            Line((-9.7399005426, 10.6335969268), (-2.555754018, 10.6335969268))
            add(Edge.make_bspline(
                [(-2.555754018, 10.6335969268), (-2.555754018, 13.836719581), (-3.3765541982, 15.203766571)],
                knots=[0, 0, 0, 1, 1, 1], degree=2))
        make_face()
    extrude(amount=F1_DEPTH)


solid = Compound([f1.part, f1b.part, f1c.part, f1d.part])
